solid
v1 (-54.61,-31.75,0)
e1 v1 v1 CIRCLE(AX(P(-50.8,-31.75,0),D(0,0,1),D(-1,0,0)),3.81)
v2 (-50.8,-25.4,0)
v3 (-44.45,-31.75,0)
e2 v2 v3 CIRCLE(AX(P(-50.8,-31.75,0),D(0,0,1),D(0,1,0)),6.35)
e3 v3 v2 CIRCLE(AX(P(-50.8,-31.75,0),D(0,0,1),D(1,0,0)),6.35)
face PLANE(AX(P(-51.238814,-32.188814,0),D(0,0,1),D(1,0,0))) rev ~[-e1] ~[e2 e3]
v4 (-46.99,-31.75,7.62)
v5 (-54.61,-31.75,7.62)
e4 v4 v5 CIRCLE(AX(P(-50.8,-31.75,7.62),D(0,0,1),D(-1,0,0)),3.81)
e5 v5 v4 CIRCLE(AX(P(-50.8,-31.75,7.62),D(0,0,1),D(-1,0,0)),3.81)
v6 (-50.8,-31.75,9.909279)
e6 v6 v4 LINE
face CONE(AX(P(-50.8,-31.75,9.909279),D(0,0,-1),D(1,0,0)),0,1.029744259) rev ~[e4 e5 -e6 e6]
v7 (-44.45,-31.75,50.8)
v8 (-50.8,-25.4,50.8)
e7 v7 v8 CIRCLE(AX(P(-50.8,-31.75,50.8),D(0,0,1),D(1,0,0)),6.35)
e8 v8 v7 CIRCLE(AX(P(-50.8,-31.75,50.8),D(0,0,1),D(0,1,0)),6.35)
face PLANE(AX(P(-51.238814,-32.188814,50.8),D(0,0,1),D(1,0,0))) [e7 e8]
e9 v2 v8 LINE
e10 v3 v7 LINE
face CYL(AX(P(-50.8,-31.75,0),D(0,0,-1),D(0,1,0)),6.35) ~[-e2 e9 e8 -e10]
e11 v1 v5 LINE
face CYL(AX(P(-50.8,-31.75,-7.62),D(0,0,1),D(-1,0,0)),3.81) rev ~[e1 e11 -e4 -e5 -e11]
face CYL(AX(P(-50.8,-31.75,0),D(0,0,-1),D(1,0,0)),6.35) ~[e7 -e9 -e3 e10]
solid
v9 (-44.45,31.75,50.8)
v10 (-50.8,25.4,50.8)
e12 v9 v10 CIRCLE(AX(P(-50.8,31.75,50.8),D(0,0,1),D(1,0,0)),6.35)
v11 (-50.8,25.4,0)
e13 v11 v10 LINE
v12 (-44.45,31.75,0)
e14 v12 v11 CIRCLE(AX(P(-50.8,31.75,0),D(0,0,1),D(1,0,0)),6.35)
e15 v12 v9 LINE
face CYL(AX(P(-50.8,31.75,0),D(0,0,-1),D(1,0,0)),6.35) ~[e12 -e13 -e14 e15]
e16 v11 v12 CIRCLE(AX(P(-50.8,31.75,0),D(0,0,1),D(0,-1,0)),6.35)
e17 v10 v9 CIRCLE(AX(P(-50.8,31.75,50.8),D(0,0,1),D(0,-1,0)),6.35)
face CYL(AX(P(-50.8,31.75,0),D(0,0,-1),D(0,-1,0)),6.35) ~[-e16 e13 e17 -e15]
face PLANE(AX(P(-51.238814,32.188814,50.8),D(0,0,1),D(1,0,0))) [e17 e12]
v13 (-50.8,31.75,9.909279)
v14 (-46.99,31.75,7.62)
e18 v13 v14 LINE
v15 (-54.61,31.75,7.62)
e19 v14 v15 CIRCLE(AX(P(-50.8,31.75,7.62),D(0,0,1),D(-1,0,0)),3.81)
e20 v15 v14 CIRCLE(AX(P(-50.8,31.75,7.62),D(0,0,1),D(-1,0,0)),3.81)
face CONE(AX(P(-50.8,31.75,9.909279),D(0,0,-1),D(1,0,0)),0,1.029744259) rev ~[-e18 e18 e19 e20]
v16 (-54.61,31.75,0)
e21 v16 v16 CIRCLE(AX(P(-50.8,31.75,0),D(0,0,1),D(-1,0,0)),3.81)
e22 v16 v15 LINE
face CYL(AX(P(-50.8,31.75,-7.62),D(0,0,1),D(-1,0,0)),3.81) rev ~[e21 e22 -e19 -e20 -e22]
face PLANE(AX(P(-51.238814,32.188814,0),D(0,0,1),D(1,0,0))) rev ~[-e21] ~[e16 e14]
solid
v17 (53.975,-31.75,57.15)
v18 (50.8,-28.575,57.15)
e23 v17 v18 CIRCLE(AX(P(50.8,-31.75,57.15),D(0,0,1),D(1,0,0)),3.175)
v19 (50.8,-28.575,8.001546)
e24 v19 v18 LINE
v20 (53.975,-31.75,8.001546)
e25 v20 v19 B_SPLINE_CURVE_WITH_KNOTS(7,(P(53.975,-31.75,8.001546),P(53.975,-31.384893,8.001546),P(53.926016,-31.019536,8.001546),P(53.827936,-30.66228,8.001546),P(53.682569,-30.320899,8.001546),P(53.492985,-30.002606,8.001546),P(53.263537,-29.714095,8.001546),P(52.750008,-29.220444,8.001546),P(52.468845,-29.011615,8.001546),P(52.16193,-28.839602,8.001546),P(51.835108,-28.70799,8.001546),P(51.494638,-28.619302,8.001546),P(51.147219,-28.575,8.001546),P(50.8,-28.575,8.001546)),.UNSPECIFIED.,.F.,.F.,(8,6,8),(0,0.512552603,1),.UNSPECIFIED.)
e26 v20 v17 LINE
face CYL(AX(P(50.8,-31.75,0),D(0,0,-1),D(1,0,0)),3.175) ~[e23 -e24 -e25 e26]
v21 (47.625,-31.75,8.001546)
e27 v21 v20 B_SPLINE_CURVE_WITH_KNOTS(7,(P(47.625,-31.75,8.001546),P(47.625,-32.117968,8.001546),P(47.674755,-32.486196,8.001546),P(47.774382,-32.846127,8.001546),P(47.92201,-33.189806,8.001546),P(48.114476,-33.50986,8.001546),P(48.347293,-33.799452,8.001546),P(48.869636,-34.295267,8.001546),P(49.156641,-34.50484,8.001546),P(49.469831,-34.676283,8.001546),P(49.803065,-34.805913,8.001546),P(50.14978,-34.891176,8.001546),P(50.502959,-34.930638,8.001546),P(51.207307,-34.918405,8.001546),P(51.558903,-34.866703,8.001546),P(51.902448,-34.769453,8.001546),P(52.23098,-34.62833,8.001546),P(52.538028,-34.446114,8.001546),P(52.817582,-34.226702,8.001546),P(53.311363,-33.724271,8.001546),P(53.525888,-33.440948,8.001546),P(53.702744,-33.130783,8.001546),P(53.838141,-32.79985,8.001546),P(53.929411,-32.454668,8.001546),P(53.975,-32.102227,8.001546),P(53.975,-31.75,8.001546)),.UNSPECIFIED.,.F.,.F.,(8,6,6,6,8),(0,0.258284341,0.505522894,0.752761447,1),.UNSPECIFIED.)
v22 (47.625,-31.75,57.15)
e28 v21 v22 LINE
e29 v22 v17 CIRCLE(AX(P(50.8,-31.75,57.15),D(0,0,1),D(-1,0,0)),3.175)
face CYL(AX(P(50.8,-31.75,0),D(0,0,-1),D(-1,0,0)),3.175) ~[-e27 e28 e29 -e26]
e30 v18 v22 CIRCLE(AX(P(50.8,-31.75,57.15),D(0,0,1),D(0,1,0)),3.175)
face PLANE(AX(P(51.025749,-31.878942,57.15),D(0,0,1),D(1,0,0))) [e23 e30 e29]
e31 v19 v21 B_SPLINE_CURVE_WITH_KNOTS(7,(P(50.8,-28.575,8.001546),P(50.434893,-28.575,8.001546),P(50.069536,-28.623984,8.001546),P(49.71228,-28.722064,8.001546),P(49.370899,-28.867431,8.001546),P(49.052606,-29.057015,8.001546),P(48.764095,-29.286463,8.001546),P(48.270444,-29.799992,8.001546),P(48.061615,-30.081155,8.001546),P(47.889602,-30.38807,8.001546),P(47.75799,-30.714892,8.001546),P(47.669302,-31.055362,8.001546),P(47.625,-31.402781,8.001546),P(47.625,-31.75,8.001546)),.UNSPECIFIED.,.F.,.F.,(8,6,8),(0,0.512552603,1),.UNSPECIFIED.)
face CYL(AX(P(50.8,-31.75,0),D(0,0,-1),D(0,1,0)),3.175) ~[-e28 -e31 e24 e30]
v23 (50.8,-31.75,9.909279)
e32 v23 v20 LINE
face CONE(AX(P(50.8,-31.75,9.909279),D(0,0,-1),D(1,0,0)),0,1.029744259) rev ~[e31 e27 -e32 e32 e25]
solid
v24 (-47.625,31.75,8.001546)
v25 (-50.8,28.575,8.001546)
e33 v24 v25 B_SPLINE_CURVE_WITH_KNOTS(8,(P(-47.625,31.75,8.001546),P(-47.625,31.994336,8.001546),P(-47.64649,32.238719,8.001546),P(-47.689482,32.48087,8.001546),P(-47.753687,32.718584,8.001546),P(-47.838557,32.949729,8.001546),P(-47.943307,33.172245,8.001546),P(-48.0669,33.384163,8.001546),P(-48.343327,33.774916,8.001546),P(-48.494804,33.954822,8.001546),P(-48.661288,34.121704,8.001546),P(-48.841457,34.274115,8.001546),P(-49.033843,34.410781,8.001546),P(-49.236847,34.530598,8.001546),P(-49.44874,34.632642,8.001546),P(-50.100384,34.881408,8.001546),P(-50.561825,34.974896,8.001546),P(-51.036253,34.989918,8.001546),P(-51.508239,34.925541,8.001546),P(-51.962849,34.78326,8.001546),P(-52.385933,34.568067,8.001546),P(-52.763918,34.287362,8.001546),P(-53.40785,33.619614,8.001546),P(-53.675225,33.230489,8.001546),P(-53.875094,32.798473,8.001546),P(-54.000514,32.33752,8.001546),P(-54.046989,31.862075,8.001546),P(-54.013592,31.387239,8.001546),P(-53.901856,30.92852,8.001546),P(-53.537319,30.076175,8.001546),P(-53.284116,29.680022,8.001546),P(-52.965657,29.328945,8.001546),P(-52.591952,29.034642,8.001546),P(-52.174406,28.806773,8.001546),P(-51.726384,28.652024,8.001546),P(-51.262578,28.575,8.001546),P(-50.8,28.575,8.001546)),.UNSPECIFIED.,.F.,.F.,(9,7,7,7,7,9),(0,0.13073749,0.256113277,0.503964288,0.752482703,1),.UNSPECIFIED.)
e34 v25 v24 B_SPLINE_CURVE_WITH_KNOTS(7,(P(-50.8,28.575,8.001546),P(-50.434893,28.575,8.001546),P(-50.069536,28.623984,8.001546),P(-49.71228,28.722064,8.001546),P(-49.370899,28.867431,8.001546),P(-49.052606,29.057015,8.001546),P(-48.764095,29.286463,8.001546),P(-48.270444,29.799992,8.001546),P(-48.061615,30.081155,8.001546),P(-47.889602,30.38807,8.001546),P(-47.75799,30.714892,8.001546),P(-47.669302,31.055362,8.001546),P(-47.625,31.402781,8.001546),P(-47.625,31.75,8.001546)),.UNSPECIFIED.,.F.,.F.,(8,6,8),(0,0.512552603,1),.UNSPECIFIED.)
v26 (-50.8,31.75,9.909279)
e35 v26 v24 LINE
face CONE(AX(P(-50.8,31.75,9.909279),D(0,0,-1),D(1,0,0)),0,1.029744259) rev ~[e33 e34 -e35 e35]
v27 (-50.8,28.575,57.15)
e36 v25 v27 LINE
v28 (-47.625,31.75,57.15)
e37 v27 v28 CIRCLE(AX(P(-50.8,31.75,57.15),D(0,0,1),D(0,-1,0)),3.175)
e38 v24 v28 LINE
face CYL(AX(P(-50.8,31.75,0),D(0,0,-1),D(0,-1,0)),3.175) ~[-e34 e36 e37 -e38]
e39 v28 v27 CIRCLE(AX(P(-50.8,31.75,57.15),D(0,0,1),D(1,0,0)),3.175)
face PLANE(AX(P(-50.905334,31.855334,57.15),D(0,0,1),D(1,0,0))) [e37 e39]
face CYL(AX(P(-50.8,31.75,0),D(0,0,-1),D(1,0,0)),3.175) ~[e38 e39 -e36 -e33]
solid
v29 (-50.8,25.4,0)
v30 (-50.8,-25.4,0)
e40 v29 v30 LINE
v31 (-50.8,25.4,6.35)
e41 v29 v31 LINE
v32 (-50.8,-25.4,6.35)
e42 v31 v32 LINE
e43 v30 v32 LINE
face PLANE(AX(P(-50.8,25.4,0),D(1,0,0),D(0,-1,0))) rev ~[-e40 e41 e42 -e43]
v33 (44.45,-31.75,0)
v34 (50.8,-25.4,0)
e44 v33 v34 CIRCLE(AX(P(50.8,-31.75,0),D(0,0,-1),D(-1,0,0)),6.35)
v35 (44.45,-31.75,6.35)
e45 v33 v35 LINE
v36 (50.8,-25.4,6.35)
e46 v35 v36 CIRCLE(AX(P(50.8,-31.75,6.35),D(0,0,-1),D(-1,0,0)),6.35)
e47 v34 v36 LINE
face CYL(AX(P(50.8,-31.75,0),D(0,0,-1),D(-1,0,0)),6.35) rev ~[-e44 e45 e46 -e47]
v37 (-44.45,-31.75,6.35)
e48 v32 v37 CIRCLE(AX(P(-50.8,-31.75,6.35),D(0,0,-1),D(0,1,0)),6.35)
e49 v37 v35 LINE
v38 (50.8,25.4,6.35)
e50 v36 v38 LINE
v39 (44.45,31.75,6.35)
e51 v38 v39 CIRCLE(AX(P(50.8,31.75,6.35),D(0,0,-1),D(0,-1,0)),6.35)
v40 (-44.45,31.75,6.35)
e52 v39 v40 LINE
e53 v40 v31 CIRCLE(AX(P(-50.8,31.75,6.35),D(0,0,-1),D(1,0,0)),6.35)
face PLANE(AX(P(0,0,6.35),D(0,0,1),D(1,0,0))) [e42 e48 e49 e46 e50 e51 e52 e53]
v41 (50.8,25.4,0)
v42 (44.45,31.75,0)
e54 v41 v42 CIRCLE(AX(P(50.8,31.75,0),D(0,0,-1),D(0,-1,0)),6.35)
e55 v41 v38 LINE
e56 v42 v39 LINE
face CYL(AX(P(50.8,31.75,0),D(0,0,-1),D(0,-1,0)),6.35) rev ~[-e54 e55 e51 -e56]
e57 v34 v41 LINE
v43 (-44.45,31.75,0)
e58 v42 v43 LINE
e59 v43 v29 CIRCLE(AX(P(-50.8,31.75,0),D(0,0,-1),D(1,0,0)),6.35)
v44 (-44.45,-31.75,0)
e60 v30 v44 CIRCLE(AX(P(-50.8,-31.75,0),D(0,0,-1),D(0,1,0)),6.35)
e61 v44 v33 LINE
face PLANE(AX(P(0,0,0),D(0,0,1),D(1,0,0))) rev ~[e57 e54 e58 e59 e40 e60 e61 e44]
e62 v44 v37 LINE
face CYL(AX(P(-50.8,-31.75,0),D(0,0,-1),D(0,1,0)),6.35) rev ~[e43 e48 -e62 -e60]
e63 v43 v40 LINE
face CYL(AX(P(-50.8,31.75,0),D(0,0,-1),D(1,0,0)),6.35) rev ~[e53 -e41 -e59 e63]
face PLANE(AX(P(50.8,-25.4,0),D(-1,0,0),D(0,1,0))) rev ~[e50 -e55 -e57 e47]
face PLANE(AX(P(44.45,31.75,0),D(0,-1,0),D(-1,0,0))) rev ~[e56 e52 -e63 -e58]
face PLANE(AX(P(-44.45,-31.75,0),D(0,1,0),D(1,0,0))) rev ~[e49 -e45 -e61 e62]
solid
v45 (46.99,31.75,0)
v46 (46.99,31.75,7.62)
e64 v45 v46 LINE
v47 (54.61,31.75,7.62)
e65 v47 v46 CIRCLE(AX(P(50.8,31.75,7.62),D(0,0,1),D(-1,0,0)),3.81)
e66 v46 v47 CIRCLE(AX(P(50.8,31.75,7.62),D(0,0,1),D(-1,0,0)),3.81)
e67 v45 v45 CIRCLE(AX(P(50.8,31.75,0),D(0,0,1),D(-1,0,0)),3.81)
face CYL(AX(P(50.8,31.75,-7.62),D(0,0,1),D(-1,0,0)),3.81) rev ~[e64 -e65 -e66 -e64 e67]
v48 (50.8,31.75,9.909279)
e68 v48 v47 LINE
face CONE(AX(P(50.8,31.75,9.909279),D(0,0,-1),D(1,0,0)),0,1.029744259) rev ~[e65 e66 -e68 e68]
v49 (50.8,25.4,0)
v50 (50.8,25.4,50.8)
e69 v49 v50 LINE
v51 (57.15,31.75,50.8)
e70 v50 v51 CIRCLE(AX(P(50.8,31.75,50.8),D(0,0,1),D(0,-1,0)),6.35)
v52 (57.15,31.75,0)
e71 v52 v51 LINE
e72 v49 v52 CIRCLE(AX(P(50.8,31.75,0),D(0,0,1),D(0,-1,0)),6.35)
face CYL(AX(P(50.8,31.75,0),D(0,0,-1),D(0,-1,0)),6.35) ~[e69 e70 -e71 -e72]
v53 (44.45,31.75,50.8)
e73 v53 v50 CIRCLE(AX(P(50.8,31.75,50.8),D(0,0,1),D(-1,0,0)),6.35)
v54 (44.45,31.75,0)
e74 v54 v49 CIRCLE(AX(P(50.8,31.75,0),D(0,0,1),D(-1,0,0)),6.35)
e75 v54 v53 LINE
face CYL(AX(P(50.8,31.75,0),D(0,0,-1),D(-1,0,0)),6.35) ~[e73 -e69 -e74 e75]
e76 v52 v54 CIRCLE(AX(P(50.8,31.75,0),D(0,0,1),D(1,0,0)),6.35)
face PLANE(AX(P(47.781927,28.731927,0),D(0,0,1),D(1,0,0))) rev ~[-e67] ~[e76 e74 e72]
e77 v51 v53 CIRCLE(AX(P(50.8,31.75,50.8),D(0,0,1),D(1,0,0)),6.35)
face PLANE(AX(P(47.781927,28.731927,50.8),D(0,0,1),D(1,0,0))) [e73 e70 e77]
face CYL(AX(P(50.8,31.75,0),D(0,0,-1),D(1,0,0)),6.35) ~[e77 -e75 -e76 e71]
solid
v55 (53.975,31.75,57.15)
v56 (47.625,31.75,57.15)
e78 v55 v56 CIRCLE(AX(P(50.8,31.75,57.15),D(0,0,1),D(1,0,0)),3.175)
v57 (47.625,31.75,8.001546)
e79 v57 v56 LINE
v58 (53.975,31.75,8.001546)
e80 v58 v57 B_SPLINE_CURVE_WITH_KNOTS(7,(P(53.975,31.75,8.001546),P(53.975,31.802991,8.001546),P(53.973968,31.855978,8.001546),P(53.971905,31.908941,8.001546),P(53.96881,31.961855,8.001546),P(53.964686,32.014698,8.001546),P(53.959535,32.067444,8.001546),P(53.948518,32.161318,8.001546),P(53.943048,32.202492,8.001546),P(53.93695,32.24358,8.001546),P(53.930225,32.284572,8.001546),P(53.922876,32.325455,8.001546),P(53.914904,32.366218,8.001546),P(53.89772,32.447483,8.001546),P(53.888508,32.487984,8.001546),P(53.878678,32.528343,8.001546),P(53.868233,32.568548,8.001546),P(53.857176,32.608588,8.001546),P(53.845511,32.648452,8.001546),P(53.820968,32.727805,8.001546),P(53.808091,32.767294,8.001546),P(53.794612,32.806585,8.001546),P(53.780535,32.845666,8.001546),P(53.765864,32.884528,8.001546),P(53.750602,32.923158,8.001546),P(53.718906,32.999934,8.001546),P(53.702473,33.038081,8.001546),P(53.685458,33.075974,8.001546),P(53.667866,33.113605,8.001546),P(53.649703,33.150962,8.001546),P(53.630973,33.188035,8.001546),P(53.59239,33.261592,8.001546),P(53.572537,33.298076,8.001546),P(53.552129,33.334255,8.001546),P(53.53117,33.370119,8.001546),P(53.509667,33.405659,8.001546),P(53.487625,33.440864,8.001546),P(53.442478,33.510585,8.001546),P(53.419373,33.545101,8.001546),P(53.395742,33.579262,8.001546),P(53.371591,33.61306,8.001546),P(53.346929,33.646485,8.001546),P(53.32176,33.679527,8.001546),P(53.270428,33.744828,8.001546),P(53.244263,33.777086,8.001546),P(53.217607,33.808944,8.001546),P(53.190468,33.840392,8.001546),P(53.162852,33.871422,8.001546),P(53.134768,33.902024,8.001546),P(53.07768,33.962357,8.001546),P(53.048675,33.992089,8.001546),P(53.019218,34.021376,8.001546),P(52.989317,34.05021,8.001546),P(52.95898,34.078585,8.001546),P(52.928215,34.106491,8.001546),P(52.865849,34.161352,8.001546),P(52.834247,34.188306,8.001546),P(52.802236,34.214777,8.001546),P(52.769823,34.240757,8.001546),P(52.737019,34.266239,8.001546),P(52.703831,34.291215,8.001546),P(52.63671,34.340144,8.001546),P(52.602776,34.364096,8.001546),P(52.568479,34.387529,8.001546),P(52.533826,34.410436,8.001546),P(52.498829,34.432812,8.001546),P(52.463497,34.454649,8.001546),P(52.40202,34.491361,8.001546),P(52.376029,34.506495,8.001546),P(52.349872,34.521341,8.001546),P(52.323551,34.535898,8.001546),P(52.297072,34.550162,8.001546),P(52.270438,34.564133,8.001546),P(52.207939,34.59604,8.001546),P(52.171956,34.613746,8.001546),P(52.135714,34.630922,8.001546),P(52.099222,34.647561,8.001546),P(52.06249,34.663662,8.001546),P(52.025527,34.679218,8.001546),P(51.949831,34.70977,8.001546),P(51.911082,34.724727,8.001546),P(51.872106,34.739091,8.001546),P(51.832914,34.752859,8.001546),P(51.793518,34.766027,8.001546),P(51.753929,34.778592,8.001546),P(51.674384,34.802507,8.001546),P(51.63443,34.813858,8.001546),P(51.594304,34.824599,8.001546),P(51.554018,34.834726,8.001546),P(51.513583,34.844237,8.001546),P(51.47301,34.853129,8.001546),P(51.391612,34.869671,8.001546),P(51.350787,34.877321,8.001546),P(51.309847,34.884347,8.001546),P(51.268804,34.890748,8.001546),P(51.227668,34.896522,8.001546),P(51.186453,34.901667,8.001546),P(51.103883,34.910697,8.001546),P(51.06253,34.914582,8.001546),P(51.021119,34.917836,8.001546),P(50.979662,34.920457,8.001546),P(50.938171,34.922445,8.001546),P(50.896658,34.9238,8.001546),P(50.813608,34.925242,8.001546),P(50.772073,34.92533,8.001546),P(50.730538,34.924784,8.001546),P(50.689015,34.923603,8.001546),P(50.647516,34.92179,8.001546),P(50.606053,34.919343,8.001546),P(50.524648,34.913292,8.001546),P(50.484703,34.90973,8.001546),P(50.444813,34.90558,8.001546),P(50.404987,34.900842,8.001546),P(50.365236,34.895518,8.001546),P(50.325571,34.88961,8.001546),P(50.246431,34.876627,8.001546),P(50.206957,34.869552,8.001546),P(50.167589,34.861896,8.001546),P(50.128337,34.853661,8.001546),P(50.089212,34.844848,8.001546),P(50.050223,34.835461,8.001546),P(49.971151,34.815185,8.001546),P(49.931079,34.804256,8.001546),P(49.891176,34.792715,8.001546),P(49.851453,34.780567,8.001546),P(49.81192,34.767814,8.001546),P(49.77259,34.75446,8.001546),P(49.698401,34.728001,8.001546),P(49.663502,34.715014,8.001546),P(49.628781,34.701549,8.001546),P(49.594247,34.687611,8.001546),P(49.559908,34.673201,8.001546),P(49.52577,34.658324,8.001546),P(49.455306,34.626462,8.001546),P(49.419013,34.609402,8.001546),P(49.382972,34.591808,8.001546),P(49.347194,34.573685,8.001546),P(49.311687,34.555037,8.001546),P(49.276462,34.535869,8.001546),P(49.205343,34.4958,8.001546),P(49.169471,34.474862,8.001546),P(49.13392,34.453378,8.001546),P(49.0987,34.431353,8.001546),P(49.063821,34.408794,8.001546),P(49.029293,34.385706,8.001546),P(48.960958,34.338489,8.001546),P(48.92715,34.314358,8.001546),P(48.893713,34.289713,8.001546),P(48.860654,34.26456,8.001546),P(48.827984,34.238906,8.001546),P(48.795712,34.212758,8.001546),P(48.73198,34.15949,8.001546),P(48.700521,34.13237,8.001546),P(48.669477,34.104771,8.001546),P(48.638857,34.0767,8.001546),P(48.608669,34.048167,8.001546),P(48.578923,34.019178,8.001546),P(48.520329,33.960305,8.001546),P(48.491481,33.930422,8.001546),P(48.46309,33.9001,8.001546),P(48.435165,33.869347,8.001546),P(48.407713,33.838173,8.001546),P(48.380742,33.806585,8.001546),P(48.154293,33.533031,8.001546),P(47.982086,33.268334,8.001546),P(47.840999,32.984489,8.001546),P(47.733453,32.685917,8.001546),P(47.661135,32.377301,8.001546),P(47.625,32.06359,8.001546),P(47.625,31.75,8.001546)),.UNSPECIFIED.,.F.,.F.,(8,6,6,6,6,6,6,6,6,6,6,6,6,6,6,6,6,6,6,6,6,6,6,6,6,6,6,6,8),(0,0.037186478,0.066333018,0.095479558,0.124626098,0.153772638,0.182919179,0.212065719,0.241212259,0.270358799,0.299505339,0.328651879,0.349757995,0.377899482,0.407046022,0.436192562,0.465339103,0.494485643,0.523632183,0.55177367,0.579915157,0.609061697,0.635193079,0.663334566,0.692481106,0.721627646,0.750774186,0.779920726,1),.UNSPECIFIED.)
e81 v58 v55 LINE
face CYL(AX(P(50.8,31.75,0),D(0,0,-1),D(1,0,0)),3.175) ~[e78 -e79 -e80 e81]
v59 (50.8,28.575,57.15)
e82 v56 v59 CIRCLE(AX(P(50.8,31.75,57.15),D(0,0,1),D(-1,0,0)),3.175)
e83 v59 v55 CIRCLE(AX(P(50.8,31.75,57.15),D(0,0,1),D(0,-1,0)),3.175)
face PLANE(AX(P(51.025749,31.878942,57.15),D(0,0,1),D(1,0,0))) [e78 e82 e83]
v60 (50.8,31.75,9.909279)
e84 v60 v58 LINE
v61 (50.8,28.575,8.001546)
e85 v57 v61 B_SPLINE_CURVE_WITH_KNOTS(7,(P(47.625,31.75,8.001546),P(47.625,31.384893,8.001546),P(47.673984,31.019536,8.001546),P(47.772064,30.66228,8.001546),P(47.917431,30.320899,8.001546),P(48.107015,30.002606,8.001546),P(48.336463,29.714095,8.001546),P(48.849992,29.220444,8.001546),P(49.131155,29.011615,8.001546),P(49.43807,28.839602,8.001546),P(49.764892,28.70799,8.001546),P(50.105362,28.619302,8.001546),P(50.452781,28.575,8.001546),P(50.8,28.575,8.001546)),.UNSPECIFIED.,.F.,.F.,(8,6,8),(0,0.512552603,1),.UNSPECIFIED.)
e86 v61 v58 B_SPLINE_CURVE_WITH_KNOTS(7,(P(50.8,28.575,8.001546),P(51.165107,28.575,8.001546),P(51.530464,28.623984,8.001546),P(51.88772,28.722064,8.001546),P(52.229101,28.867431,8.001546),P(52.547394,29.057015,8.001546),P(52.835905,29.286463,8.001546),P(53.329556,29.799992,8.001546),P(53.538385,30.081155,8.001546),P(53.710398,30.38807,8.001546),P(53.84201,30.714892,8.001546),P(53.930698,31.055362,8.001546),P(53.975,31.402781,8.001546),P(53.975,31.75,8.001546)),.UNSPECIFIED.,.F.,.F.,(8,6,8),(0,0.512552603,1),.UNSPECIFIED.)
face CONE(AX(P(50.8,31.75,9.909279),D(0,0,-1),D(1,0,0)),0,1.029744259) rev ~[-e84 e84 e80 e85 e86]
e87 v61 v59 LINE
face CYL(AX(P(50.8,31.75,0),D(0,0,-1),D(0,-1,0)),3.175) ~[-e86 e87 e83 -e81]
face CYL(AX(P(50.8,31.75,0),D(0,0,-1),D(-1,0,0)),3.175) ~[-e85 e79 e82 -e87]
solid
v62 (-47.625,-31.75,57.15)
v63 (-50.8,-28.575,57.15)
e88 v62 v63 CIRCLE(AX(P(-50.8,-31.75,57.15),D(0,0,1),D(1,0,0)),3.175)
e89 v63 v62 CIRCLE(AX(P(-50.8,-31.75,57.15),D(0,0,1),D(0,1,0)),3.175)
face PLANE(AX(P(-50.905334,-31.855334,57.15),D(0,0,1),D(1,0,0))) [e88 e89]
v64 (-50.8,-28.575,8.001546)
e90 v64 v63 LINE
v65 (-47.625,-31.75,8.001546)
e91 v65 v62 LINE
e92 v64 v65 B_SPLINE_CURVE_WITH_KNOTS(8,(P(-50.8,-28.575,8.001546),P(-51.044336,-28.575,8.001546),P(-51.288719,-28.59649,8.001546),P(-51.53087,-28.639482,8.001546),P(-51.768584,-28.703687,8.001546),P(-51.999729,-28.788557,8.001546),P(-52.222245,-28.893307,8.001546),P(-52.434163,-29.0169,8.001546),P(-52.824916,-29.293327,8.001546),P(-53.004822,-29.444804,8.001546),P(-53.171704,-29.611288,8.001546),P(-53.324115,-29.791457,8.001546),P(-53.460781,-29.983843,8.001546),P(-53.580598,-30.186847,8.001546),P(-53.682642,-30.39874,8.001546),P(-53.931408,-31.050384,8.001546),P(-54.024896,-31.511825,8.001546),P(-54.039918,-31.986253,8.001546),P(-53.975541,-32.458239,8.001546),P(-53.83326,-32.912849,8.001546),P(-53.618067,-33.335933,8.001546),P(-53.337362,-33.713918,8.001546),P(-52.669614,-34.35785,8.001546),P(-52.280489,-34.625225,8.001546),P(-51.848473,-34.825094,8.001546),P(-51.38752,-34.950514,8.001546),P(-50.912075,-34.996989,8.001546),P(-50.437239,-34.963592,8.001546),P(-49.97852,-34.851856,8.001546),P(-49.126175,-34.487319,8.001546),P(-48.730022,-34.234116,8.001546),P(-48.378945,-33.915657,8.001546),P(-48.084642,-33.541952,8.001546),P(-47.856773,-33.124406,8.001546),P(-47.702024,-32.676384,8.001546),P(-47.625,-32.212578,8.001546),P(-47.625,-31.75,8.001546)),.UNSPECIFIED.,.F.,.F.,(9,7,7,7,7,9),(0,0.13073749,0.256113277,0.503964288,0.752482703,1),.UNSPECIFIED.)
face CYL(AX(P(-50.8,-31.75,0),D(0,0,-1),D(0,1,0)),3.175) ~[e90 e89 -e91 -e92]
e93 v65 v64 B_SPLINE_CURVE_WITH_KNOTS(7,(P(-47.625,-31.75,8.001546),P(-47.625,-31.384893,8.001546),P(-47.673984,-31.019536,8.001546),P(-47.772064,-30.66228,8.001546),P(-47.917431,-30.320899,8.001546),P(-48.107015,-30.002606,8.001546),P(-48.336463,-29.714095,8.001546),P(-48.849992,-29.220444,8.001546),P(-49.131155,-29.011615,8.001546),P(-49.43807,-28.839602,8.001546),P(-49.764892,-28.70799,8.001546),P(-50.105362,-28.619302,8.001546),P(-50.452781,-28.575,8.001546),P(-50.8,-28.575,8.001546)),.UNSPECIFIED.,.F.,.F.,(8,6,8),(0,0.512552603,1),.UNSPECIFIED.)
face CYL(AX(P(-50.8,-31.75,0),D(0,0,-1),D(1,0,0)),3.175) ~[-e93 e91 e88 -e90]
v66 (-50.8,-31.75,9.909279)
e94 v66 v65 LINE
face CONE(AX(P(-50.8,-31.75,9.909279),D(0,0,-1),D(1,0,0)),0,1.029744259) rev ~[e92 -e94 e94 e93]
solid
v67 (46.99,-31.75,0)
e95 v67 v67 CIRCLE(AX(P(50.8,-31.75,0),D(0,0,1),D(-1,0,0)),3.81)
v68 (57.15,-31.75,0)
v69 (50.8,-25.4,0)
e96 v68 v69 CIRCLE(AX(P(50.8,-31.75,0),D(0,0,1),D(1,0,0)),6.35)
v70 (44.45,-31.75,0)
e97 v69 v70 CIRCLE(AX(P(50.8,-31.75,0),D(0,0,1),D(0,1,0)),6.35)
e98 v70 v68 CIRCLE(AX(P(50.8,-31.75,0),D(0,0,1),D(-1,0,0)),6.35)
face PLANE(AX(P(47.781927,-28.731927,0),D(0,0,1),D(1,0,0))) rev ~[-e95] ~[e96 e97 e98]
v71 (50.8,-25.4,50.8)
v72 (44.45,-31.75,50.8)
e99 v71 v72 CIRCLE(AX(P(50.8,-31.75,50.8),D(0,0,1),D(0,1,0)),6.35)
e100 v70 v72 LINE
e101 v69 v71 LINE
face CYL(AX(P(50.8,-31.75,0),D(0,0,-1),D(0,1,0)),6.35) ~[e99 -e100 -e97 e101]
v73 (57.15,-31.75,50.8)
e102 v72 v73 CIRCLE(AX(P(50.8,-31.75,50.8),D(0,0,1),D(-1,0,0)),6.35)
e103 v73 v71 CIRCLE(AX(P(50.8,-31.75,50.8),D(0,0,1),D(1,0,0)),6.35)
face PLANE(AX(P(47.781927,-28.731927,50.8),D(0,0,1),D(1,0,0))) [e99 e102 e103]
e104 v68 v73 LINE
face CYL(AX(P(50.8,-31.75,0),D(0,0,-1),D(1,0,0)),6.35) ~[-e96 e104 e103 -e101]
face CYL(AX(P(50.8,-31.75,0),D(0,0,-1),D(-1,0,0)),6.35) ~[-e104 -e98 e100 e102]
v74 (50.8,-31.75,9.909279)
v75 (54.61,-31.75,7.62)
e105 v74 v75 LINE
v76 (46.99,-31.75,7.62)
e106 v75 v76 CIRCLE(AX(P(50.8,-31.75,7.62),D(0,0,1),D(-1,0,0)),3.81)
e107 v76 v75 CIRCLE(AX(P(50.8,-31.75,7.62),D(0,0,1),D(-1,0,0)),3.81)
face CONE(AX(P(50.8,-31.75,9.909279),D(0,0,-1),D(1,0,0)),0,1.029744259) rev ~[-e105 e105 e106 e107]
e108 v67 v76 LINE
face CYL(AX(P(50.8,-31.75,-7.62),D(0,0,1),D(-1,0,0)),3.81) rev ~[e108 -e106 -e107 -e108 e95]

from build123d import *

# Parameters (mm, degrees)
F1_DEPTH   = 50.8
F2_DEPTH   = 6.35
F3_DEPTH   = 57.15
F4_D       = 7.62
F4_DEPTH   = 7.62
F4_TIP     = 2.2892789585
F4_2_D     = 7.62
F4_2_DEPTH = 7.62
F4_2_TIP   = 2.2892789585
F4_3_D     = 7.62
F4_3_DEPTH = 7.62
F4_3_TIP   = 2.2892789585
F4_4_D     = 7.62
F4_4_DEPTH = 7.62
F4_4_TIP   = 2.2892789585
F4_5_D     = 7.62
F4_5_DEPTH = 7.62
F4_5_TIP   = 2.2892789585
F4_6_D     = 7.62
F4_6_DEPTH = 7.62
F4_6_TIP   = 2.2892789585
F4_7_D     = 7.62
F4_7_DEPTH = 7.62
F4_7_TIP   = 2.2892789585
F4_8_D     = 7.62
F4_8_DEPTH = 7.62
F4_8_TIP   = 2.2892789585


with BuildPart() as f1:
    # F0 (on Top) → F1 (new body)
    with BuildSketch(Plane.XY):
        with BuildLine():
            Line((-47.625, 31.75), (-44.45, 31.75))
            ThreePointArc((-44.45, 31.75), (-55.2901280605, 36.2401280605), (-50.8, 25.4))
            Line((-50.8, 25.4), (-50.8, 28.575))
            ThreePointArc((-50.8, 28.575), (-53.0450640303, 33.9950640303), (-47.625, 31.75))
        make_face()
        with BuildLine():
            Line((-50.8, 31.75), (-47.625, 31.75))
            ThreePointArc((-47.625, 31.75), (-53.0450640303, 33.9950640303), (-50.8, 28.575))
            Line((-50.8, 28.575), (-50.8, 31.75))
        make_face()
        with BuildLine():
            ThreePointArc((-50.8, 28.575), (-48.5549359697, 29.5049359697), (-47.625, 31.75))
            Line((-47.625, 31.75), (-50.8, 31.75))
            Line((-50.8, 31.75), (-50.8, 28.575))
        make_face()
        with BuildLine():
            ThreePointArc((-50.8, 25.4), (-46.3098719395, 27.2598719395), (-44.45, 31.75))
            Line((-44.45, 31.75), (-47.625, 31.75))
            ThreePointArc((-47.625, 31.75), (-48.5549359697, 29.5049359697), (-50.8, 28.575))
            Line((-50.8, 28.575), (-50.8, 25.4))
        make_face()
    extrude(amount=F1_DEPTH)

    # F4
    with Locations(Plane(origin=(0, 0, 0), x_dir=(1, 0, 0), z_dir=(0, 0, -1))):
        with Locations((-50.8, 31.75), (-50.8, -31.75), (50.8, -31.75), (50.8, 31.75)):
            Hole(F4_D / 2, depth=F4_DEPTH)
            with Locations((0, 0, -(F4_DEPTH + F4_TIP / 2))):  # 118° drill point
                Cone(0, F4_D / 2, F4_TIP, mode=Mode.SUBTRACT)


with BuildPart() as f1b:
    # F0 (on Top) → F1, piece 2 (new body)
    with BuildSketch(Plane.XY):
        with BuildLine():
            Line((47.625, 31.75), (44.45, 31.75))
            ThreePointArc((44.45, 31.75), (46.3098719395, 27.2598719395), (50.8, 25.4))
            Line((50.8, 25.4), (50.8, 28.575))
            ThreePointArc((50.8, 28.575), (48.5549359697, 29.5049359697), (47.625, 31.75))
        make_face()
        with BuildLine():
            Line((50.8, 31.75), (47.625, 31.75))
            ThreePointArc((47.625, 31.75), (48.5549359697, 29.5049359697), (50.8, 28.575))
            Line((50.8, 28.575), (50.8, 31.75))
        make_face()
        with BuildLine():
            ThreePointArc((57.15, 31.75), (50.8, 38.1), (44.45, 31.75))
            Line((44.45, 31.75), (47.625, 31.75))
            ThreePointArc((47.625, 31.75), (50.8, 34.925), (53.975, 31.75))
            ThreePointArc((53.975, 31.75), (53.0450640303, 29.5049359697), (50.8, 28.575))
            Line((50.8, 28.575), (50.8, 25.4))
            ThreePointArc((50.8, 25.4), (55.2901280605, 27.2598719395), (57.15, 31.75))
        make_face()
        with BuildLine():
            ThreePointArc((53.975, 31.75), (50.8, 34.925), (47.625, 31.75))
            Line((47.625, 31.75), (50.8, 31.75))
            Line((50.8, 31.75), (50.8, 28.575))
            ThreePointArc((50.8, 28.575), (53.0450640303, 29.5049359697), (53.975, 31.75))
        make_face()
    extrude(amount=F1_DEPTH)

    # F4#2
    with Locations(Plane(origin=(0, 0, 0), x_dir=(1, 0, 0), z_dir=(0, 0, -1))):
        with Locations((-50.8, 31.75), (-50.8, -31.75), (50.8, -31.75), (50.8, 31.75)):
            Hole(F4_2_D / 2, depth=F4_2_DEPTH)
            with Locations((0, 0, -(F4_2_DEPTH + F4_2_TIP / 2))):  # 118° drill point
                Cone(0, F4_2_D / 2, F4_2_TIP, mode=Mode.SUBTRACT)


with BuildPart() as f1c:
    # F0 (on Top) → F1, piece 3 (new body)
    with BuildSketch(Plane.XY):
        with BuildLine():
            Line((50.8, -28.575), (50.8, -25.4))
            ThreePointArc((50.8, -25.4), (46.3098719395, -27.2598719395), (44.45, -31.75))
            Line((44.45, -31.75), (47.625, -31.75))
            ThreePointArc((47.625, -31.75), (48.5549359697, -29.5049359697), (50.8, -28.575))
        make_face()
        with BuildLine():
            ThreePointArc((57.15, -31.75), (55.2901280605, -27.2598719395), (50.8, -25.4))
            Line((50.8, -25.4), (50.8, -28.575))
            ThreePointArc((50.8, -28.575), (53.0450640303, -29.5049359697), (53.975, -31.75))
            ThreePointArc((53.975, -31.75), (50.8, -34.925), (47.625, -31.75))
            Line((47.625, -31.75), (44.45, -31.75))
            ThreePointArc((44.45, -31.75), (50.8, -38.1), (57.15, -31.75))
        make_face()
        with BuildLine():
            ThreePointArc((53.975, -31.75), (53.0450640303, -29.5049359697), (50.8, -28.575))
            Line((50.8, -28.575), (50.8, -31.75))
            Line((50.8, -31.75), (47.625, -31.75))
            ThreePointArc((47.625, -31.75), (50.8, -34.925), (53.975, -31.75))
        make_face()
        with BuildLine():
            Line((50.8, -31.75), (50.8, -28.575))
            ThreePointArc((50.8, -28.575), (48.5549359697, -29.5049359697), (47.625, -31.75))
            Line((47.625, -31.75), (50.8, -31.75))
        make_face()
    extrude(amount=F1_DEPTH)

    # F4#3
    with Locations(Plane(origin=(0, 0, 0), x_dir=(1, 0, 0), z_dir=(0, 0, -1))):
        with Locations((-50.8, 31.75), (-50.8, -31.75), (50.8, -31.75), (50.8, 31.75)):
            Hole(F4_3_D / 2, depth=F4_3_DEPTH)
            with Locations((0, 0, -(F4_3_DEPTH + F4_3_TIP / 2))):  # 118° drill point
                Cone(0, F4_3_D / 2, F4_3_TIP, mode=Mode.SUBTRACT)


with BuildPart() as f1d:
    # F0 (on Top) → F1, piece 4 (new body)
    with BuildSketch(Plane.XY):
        with BuildLine():
            Line((-50.8, -28.575), (-50.8, -25.4))
            ThreePointArc((-50.8, -25.4), (-55.2901280605, -36.2401280605), (-44.45, -31.75))
            Line((-44.45, -31.75), (-47.625, -31.75))
            ThreePointArc((-47.625, -31.75), (-53.0450640303, -33.9950640303), (-50.8, -28.575))
        make_face()
        with BuildLine():
            Line((-50.8, -31.75), (-50.8, -28.575))
            ThreePointArc((-50.8, -28.575), (-53.0450640303, -33.9950640303), (-47.625, -31.75))
            Line((-47.625, -31.75), (-50.8, -31.75))
        make_face()
        with BuildLine():
            ThreePointArc((-47.625, -31.75), (-48.5549359697, -29.5049359697), (-50.8, -28.575))
            Line((-50.8, -28.575), (-50.8, -31.75))
            Line((-50.8, -31.75), (-47.625, -31.75))
        make_face()
        with BuildLine():
            ThreePointArc((-44.45, -31.75), (-46.3098719395, -27.2598719395), (-50.8, -25.4))
            Line((-50.8, -25.4), (-50.8, -28.575))
            ThreePointArc((-50.8, -28.575), (-48.5549359697, -29.5049359697), (-47.625, -31.75))
            Line((-47.625, -31.75), (-44.45, -31.75))
        make_face()
    extrude(amount=F1_DEPTH)

    # F4#4
    with Locations(Plane(origin=(0, 0, 0), x_dir=(1, 0, 0), z_dir=(0, 0, -1))):
        with Locations((-50.8, 31.75), (-50.8, -31.75), (50.8, -31.75), (50.8, 31.75)):
            Hole(F4_4_D / 2, depth=F4_4_DEPTH)
            with Locations((0, 0, -(F4_4_DEPTH + F4_4_TIP / 2))):  # 118° drill point
                Cone(0, F4_4_D / 2, F4_4_TIP, mode=Mode.SUBTRACT)


with BuildPart() as f2:
    # F0 (on Top) → F2 (new body)
    with BuildSketch(Plane.XY):
        with BuildLine():
            Line((44.45, 31.75), (-44.45, 31.75))
            ThreePointArc((-44.45, 31.75), (-46.3098719395, 27.2598719395), (-50.8, 25.4))
            Line((-50.8, 25.4), (-50.8, -25.4))
            ThreePointArc((-50.8, -25.4), (-46.3098719395, -27.2598719395), (-44.45, -31.75))
            Line((-44.45, -31.75), (44.45, -31.75))
            ThreePointArc((44.45, -31.75), (46.3098719395, -27.2598719395), (50.8, -25.4))
            Line((50.8, -25.4), (50.8, 25.4))
            ThreePointArc((50.8, 25.4), (46.3098719395, 27.2598719395), (44.45, 31.75))
        make_face()
    extrude(amount=F2_DEPTH)


with BuildPart() as f3:
    # F0 (on Top) → F3 (new body)
    with BuildSketch(Plane.XY):
        with BuildLine():
            Line((-50.8, -31.75), (-50.8, -28.575))
            ThreePointArc((-50.8, -28.575), (-53.0450640303, -33.9950640303), (-47.625, -31.75))
            Line((-47.625, -31.75), (-50.8, -31.75))
        make_face()
        with BuildLine():
            ThreePointArc((-47.625, -31.75), (-48.5549359697, -29.5049359697), (-50.8, -28.575))
            Line((-50.8, -28.575), (-50.8, -31.75))
            Line((-50.8, -31.75), (-47.625, -31.75))
        make_face()
    extrude(amount=F3_DEPTH)

    # F4#5
    with Locations(Plane(origin=(0, 0, 0), x_dir=(1, 0, 0), z_dir=(0, 0, -1))):
        with Locations((-50.8, 31.75), (-50.8, -31.75), (50.8, -31.75), (50.8, 31.75)):
            Hole(F4_5_D / 2, depth=F4_5_DEPTH)
            with Locations((0, 0, -(F4_5_DEPTH + F4_5_TIP / 2))):  # 118° drill point
                Cone(0, F4_5_D / 2, F4_5_TIP, mode=Mode.SUBTRACT)


with BuildPart() as f3b:
    # F0 (on Top) → F3, piece 2 (new body)
    with BuildSketch(Plane.XY):
        with BuildLine():
            Line((-50.8, 31.75), (-47.625, 31.75))
            ThreePointArc((-47.625, 31.75), (-53.0450640303, 33.9950640303), (-50.8, 28.575))
            Line((-50.8, 28.575), (-50.8, 31.75))
        make_face()
        with BuildLine():
            ThreePointArc((-50.8, 28.575), (-48.5549359697, 29.5049359697), (-47.625, 31.75))
            Line((-47.625, 31.75), (-50.8, 31.75))
            Line((-50.8, 31.75), (-50.8, 28.575))
        make_face()
    extrude(amount=F3_DEPTH)

    # F4#6
    with Locations(Plane(origin=(0, 0, 0), x_dir=(1, 0, 0), z_dir=(0, 0, -1))):
        with Locations((-50.8, 31.75), (-50.8, -31.75), (50.8, -31.75), (50.8, 31.75)):
            Hole(F4_6_D / 2, depth=F4_6_DEPTH)
            with Locations((0, 0, -(F4_6_DEPTH + F4_6_TIP / 2))):  # 118° drill point
                Cone(0, F4_6_D / 2, F4_6_TIP, mode=Mode.SUBTRACT)


with BuildPart() as f3c:
    # F0 (on Top) → F3, piece 3 (new body)
    with BuildSketch(Plane.XY):
        with BuildLine():
            ThreePointArc((53.975, 31.75), (50.8, 34.925), (47.625, 31.75))
            Line((47.625, 31.75), (50.8, 31.75))
            Line((50.8, 31.75), (50.8, 28.575))
            ThreePointArc((50.8, 28.575), (53.0450640303, 29.5049359697), (53.975, 31.75))
        make_face()
        with BuildLine():
            Line((50.8, 31.75), (47.625, 31.75))
            ThreePointArc((47.625, 31.75), (48.5549359697, 29.5049359697), (50.8, 28.575))
            Line((50.8, 28.575), (50.8, 31.75))
        make_face()
    extrude(amount=F3_DEPTH)

    # F4#7
    with Locations(Plane(origin=(0, 0, 0), x_dir=(1, 0, 0), z_dir=(0, 0, -1))):
        with Locations((-50.8, 31.75), (-50.8, -31.75), (50.8, -31.75), (50.8, 31.75)):
            Hole(F4_7_D / 2, depth=F4_7_DEPTH)
            with Locations((0, 0, -(F4_7_DEPTH + F4_7_TIP / 2))):  # 118° drill point
                Cone(0, F4_7_D / 2, F4_7_TIP, mode=Mode.SUBTRACT)


with BuildPart() as f3d:
    # F0 (on Top) → F3, piece 4 (new body)
    with BuildSketch(Plane.XY):
        with BuildLine():
            ThreePointArc((53.975, -31.75), (53.0450640303, -29.5049359697), (50.8, -28.575))
            Line((50.8, -28.575), (50.8, -31.75))
            Line((50.8, -31.75), (47.625, -31.75))
            ThreePointArc((47.625, -31.75), (50.8, -34.925), (53.975, -31.75))
        make_face()
        with BuildLine():
            Line((50.8, -31.75), (50.8, -28.575))
            ThreePointArc((50.8, -28.575), (48.5549359697, -29.5049359697), (47.625, -31.75))
            Line((47.625, -31.75), (50.8, -31.75))
        make_face()
    extrude(amount=F3_DEPTH)

    # F4#8
    with Locations(Plane(origin=(0, 0, 0), x_dir=(1, 0, 0), z_dir=(0, 0, -1))):
        with Locations((-50.8, 31.75), (-50.8, -31.75), (50.8, -31.75), (50.8, 31.75)):
            Hole(F4_8_D / 2, depth=F4_8_DEPTH)
            with Locations((0, 0, -(F4_8_DEPTH + F4_8_TIP / 2))):  # 118° drill point
                Cone(0, F4_8_D / 2, F4_8_TIP, mode=Mode.SUBTRACT)


solid = Compound([f1.part, f1b.part, f1c.part, f1d.part, f2.part, f3.part, f3b.part, f3c.part, f3d.part])
